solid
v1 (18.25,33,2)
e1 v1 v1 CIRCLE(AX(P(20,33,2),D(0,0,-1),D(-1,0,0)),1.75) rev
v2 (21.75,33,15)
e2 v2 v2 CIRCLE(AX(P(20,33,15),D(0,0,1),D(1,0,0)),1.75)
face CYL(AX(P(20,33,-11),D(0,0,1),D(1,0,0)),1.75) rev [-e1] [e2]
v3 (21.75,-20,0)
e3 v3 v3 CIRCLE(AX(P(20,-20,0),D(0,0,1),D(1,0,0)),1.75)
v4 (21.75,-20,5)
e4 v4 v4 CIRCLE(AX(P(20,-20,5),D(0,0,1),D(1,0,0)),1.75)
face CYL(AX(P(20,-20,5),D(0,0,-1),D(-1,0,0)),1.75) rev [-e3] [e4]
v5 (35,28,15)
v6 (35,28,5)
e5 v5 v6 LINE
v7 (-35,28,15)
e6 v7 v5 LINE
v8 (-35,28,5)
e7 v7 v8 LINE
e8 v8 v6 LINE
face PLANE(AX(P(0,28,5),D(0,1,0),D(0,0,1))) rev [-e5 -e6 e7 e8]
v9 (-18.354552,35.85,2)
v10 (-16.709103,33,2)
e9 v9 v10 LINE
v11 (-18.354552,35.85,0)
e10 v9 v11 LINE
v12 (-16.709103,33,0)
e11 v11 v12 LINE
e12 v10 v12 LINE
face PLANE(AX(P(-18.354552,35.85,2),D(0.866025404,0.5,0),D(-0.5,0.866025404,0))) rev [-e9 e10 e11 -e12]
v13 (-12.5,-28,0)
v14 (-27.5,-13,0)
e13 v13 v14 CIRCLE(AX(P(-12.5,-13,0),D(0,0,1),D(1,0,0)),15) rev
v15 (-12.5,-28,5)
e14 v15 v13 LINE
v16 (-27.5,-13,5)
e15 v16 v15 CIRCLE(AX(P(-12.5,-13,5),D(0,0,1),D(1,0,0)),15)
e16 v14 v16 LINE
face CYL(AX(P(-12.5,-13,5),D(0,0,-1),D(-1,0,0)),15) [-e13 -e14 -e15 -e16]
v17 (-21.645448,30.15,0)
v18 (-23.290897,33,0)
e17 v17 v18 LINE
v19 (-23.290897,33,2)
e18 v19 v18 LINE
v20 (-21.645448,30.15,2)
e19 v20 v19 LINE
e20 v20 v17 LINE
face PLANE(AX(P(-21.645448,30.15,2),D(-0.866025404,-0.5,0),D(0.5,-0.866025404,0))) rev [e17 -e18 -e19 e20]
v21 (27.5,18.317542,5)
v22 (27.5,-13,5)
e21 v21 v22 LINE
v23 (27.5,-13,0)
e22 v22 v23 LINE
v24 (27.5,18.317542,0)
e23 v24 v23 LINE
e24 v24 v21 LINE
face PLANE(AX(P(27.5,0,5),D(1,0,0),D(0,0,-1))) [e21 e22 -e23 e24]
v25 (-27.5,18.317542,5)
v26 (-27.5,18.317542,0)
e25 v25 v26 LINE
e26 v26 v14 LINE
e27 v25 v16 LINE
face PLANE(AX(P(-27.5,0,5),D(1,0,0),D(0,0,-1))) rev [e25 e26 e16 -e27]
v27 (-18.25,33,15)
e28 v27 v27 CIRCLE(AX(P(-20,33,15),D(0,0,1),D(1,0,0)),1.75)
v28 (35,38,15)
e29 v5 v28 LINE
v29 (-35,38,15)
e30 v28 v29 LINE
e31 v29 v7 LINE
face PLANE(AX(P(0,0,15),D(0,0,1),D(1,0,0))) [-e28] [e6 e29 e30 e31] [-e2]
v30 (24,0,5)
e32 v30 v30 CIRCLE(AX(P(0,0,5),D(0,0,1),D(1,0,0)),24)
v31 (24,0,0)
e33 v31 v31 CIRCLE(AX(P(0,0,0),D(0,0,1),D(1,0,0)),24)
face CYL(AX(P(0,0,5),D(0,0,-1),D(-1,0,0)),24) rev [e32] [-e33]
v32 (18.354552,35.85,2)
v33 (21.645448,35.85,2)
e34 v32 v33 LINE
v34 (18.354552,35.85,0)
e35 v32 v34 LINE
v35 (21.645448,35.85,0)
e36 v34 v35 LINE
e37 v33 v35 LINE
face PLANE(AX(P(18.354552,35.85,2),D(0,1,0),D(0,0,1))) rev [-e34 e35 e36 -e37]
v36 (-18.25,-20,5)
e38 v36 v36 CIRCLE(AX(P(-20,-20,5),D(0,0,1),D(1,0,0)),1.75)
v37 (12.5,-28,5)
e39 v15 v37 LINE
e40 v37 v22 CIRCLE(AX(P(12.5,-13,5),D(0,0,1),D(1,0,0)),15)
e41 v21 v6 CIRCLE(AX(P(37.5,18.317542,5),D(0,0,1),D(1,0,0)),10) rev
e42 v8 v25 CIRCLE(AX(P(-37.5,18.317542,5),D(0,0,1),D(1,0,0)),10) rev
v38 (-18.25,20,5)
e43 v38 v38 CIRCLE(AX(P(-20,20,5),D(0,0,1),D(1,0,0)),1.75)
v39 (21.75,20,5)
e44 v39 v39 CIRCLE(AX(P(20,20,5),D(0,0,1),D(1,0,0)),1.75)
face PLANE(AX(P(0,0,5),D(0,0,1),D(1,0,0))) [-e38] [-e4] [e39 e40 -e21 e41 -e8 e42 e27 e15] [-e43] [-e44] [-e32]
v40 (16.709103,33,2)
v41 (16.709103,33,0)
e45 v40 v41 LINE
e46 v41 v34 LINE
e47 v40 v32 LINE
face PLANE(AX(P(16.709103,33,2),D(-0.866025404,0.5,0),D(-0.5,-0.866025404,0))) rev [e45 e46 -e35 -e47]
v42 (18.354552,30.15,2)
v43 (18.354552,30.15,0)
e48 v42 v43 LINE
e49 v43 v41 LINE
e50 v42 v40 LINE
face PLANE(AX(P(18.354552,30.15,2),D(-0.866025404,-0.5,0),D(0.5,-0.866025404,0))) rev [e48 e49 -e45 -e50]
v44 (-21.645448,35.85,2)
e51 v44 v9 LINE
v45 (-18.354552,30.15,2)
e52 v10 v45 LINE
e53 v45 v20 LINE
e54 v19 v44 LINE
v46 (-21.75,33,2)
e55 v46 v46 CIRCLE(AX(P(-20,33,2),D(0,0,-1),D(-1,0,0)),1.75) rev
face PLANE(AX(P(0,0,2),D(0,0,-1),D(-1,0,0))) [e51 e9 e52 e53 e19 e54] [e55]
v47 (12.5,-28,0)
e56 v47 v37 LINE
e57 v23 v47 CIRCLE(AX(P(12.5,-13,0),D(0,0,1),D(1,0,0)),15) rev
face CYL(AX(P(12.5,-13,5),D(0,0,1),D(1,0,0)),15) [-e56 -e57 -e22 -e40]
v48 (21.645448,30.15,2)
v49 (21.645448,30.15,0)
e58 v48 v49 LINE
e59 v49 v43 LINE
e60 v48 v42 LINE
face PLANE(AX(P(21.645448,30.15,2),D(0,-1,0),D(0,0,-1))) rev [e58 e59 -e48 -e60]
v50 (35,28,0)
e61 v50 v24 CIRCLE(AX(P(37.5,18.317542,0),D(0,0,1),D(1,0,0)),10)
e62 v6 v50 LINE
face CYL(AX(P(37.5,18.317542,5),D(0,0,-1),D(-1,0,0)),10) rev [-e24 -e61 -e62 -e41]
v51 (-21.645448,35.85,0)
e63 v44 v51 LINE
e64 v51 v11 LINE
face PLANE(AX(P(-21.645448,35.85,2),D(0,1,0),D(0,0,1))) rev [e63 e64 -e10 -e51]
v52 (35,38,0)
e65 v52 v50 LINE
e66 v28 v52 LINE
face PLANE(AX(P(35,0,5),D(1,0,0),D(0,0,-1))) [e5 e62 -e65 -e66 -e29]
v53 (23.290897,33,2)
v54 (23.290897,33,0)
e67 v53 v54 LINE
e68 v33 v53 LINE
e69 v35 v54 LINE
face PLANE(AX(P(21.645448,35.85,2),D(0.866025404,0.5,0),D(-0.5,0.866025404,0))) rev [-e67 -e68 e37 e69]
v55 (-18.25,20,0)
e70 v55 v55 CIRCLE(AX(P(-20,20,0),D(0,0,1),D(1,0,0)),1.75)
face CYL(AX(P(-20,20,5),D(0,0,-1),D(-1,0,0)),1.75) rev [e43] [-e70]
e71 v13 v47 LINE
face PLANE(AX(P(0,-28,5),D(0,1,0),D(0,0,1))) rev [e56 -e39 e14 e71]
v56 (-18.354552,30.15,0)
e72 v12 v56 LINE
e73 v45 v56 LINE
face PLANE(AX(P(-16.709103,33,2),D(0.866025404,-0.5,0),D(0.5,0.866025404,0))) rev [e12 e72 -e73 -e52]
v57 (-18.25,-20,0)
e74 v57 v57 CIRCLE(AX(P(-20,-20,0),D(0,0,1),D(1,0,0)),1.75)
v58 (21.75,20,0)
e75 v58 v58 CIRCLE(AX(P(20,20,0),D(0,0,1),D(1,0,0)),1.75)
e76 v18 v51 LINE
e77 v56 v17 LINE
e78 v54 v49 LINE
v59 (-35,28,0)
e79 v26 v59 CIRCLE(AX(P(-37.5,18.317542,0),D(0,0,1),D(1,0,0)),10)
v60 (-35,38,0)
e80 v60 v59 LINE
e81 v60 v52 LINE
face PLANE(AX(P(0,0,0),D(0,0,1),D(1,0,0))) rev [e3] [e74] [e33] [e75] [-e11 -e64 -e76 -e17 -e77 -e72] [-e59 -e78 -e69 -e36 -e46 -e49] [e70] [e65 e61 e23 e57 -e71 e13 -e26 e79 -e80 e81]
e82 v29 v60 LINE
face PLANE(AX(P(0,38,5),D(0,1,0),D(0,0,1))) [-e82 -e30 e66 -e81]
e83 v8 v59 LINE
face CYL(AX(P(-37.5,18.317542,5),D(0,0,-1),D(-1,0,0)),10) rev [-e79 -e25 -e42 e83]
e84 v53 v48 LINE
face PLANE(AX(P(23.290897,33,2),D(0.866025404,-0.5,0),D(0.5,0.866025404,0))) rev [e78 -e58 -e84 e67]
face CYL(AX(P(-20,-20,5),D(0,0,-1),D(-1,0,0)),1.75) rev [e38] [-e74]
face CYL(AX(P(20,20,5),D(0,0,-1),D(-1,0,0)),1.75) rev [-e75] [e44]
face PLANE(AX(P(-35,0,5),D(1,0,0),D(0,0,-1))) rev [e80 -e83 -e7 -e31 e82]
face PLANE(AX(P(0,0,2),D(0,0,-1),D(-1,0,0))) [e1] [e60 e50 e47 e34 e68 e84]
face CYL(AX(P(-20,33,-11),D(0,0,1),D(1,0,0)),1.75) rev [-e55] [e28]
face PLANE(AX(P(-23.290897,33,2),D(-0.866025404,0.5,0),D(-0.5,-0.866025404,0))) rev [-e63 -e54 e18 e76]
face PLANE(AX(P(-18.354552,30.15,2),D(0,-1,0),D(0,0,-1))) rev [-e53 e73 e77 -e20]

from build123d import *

# Parameters (mm, degrees)
ESQUISSE1_W             = 55
ESQUISSE1_H             = 56
ESQUISSE1_R             = 1.75
ESQUISSE1_R_2           = 24
BOSS_EXTRU_1_DEPTH      = 5
CONG_1_R                = 15
ESQUISSE2_W             = 70
ESQUISSE2_H             = 10
BOSS_EXTRU_2_DEPTH      = 10
ESQUISSE3_R             = 1.75
ENL_V_MAT_EXTRU_1_DEPTH = 26
ENL_V_MAT_EXTRU_2_DEPTH = 2
CONG_2_R                = 10


with BuildPart() as part:
    # Esquisse1 → Boss.-Extru.1 (new body)
    # profile 1 of 2: a face of its own
    with BuildSketch(Plane.XY):
        Rectangle(ESQUISSE1_W, ESQUISSE1_H)
        with Locations((-20, -20)):
            Circle(ESQUISSE1_R, mode=Mode.SUBTRACT)
        with Locations((20, -20)):
            Circle(ESQUISSE1_R, mode=Mode.SUBTRACT)
        with Locations((20, 20)):
            Circle(ESQUISSE1_R, mode=Mode.SUBTRACT)
        with Locations((-20, 20)):
            Circle(ESQUISSE1_R, mode=Mode.SUBTRACT)
        Circle(ESQUISSE1_R_2, mode=Mode.SUBTRACT)
    # profile 2 of 2: a face of its own
    with BuildSketch(Plane.XY):
        Polygon((-35, 28), (-27.5, 28), (27.5, 28), (35, 28), (35, 38), (-35, 38), align=None)
    extrude(amount=BOSS_EXTRU_1_DEPTH)

    # Congé1
    cong_1_edges = [part.edges().sort_by_distance(p)[0] for p in [
        (27.5, -28, 2.5),
        (-27.5, -28, 2.5),
    ]]
    fillet(cong_1_edges, radius=CONG_1_R)

    # Esquisse2 → Boss.-Extru.2 (add)
    with BuildSketch(Plane.XY.offset(5)):
        with Locations((0, 33)):
            Rectangle(ESQUISSE2_W, ESQUISSE2_H)
    extrude(amount=BOSS_EXTRU_2_DEPTH)

    # Esquisse3 → Enlèv. mat.-Extru.1 (cut)
    with BuildSketch(Plane.XY.offset(15)):
        with Locations((-20, 33)):
            Circle(ESQUISSE3_R)
        with Locations((20, 33)):
            Circle(ESQUISSE3_R)
    extrude(amount=-ENL_V_MAT_EXTRU_1_DEPTH, mode=Mode.SUBTRACT)

    # Esquisse4 → Enlèv. mat.-Extru.2 (cut)
    with BuildSketch(Plane(origin=(0, 0, 0), x_dir=(-1, 0, 0), z_dir=(0, 0, -1))):
        Polygon((-16.709103466, 33), (-18.354551733, 35.85), (-21.645448267, 35.85), (-23.290896534, 33), (-21.645448267, 30.15), (-18.354551733, 30.15), align=None)
        Polygon((16.709103466, 33), (18.354551733, 30.15), (21.645448267, 30.15), (23.290896534, 33), (21.645448267, 35.85), (18.354551733, 35.85), align=None)
    extrude(amount=-ENL_V_MAT_EXTRU_2_DEPTH, mode=Mode.SUBTRACT)

    # Congé2
    # the kernel refuses this fillet: 10 mm, written as the material it adds along each edge
    with BuildSketch(Plane(origin=(-27.5, 28, 0), x_dir=(0, -1, 0), z_dir=(0, 0, 1))) as cong_2_piece_1:
        with BuildLine():
            CenterArc((9.682458366, -10), CONG_2_R, 90, 75.522487814)
            Line((0, -7.5), (-0.193649167, -7.45))
            ThreePointArc((-0.193649167, -7.45), (-0.2, -3.75), (-0.2, 0))
            Line((-0.2, 0), (0, 0.2))
            Line((0, 0.2), (9.682458366, 0.2))
            Line((9.682458366, 0.2), (9.682458366, 0))
        make_face()
    extrude(amount=5)
    with BuildSketch(Plane(origin=(27.5, 28, 0), x_dir=(1, 0, 0), z_dir=(0, 0, 1))) as cong_2_piece_2:
        with BuildLine():
            CenterArc((10, -9.682458366), CONG_2_R, 104.477512186, 75.522487814)
            Line((0, -9.682458366), (-0.2, -9.682458366))
            Line((-0.2, -9.682458366), (-0.2, 0))
            Line((-0.2, 0), (0, 0.2))
            ThreePointArc((0, 0.2), (3.75, 0.2), (7.45, 0.193649167))
            Line((7.45, 0.193649167), (7.5, 0))
        make_face()
    extrude(amount=5)


solid = part.part
